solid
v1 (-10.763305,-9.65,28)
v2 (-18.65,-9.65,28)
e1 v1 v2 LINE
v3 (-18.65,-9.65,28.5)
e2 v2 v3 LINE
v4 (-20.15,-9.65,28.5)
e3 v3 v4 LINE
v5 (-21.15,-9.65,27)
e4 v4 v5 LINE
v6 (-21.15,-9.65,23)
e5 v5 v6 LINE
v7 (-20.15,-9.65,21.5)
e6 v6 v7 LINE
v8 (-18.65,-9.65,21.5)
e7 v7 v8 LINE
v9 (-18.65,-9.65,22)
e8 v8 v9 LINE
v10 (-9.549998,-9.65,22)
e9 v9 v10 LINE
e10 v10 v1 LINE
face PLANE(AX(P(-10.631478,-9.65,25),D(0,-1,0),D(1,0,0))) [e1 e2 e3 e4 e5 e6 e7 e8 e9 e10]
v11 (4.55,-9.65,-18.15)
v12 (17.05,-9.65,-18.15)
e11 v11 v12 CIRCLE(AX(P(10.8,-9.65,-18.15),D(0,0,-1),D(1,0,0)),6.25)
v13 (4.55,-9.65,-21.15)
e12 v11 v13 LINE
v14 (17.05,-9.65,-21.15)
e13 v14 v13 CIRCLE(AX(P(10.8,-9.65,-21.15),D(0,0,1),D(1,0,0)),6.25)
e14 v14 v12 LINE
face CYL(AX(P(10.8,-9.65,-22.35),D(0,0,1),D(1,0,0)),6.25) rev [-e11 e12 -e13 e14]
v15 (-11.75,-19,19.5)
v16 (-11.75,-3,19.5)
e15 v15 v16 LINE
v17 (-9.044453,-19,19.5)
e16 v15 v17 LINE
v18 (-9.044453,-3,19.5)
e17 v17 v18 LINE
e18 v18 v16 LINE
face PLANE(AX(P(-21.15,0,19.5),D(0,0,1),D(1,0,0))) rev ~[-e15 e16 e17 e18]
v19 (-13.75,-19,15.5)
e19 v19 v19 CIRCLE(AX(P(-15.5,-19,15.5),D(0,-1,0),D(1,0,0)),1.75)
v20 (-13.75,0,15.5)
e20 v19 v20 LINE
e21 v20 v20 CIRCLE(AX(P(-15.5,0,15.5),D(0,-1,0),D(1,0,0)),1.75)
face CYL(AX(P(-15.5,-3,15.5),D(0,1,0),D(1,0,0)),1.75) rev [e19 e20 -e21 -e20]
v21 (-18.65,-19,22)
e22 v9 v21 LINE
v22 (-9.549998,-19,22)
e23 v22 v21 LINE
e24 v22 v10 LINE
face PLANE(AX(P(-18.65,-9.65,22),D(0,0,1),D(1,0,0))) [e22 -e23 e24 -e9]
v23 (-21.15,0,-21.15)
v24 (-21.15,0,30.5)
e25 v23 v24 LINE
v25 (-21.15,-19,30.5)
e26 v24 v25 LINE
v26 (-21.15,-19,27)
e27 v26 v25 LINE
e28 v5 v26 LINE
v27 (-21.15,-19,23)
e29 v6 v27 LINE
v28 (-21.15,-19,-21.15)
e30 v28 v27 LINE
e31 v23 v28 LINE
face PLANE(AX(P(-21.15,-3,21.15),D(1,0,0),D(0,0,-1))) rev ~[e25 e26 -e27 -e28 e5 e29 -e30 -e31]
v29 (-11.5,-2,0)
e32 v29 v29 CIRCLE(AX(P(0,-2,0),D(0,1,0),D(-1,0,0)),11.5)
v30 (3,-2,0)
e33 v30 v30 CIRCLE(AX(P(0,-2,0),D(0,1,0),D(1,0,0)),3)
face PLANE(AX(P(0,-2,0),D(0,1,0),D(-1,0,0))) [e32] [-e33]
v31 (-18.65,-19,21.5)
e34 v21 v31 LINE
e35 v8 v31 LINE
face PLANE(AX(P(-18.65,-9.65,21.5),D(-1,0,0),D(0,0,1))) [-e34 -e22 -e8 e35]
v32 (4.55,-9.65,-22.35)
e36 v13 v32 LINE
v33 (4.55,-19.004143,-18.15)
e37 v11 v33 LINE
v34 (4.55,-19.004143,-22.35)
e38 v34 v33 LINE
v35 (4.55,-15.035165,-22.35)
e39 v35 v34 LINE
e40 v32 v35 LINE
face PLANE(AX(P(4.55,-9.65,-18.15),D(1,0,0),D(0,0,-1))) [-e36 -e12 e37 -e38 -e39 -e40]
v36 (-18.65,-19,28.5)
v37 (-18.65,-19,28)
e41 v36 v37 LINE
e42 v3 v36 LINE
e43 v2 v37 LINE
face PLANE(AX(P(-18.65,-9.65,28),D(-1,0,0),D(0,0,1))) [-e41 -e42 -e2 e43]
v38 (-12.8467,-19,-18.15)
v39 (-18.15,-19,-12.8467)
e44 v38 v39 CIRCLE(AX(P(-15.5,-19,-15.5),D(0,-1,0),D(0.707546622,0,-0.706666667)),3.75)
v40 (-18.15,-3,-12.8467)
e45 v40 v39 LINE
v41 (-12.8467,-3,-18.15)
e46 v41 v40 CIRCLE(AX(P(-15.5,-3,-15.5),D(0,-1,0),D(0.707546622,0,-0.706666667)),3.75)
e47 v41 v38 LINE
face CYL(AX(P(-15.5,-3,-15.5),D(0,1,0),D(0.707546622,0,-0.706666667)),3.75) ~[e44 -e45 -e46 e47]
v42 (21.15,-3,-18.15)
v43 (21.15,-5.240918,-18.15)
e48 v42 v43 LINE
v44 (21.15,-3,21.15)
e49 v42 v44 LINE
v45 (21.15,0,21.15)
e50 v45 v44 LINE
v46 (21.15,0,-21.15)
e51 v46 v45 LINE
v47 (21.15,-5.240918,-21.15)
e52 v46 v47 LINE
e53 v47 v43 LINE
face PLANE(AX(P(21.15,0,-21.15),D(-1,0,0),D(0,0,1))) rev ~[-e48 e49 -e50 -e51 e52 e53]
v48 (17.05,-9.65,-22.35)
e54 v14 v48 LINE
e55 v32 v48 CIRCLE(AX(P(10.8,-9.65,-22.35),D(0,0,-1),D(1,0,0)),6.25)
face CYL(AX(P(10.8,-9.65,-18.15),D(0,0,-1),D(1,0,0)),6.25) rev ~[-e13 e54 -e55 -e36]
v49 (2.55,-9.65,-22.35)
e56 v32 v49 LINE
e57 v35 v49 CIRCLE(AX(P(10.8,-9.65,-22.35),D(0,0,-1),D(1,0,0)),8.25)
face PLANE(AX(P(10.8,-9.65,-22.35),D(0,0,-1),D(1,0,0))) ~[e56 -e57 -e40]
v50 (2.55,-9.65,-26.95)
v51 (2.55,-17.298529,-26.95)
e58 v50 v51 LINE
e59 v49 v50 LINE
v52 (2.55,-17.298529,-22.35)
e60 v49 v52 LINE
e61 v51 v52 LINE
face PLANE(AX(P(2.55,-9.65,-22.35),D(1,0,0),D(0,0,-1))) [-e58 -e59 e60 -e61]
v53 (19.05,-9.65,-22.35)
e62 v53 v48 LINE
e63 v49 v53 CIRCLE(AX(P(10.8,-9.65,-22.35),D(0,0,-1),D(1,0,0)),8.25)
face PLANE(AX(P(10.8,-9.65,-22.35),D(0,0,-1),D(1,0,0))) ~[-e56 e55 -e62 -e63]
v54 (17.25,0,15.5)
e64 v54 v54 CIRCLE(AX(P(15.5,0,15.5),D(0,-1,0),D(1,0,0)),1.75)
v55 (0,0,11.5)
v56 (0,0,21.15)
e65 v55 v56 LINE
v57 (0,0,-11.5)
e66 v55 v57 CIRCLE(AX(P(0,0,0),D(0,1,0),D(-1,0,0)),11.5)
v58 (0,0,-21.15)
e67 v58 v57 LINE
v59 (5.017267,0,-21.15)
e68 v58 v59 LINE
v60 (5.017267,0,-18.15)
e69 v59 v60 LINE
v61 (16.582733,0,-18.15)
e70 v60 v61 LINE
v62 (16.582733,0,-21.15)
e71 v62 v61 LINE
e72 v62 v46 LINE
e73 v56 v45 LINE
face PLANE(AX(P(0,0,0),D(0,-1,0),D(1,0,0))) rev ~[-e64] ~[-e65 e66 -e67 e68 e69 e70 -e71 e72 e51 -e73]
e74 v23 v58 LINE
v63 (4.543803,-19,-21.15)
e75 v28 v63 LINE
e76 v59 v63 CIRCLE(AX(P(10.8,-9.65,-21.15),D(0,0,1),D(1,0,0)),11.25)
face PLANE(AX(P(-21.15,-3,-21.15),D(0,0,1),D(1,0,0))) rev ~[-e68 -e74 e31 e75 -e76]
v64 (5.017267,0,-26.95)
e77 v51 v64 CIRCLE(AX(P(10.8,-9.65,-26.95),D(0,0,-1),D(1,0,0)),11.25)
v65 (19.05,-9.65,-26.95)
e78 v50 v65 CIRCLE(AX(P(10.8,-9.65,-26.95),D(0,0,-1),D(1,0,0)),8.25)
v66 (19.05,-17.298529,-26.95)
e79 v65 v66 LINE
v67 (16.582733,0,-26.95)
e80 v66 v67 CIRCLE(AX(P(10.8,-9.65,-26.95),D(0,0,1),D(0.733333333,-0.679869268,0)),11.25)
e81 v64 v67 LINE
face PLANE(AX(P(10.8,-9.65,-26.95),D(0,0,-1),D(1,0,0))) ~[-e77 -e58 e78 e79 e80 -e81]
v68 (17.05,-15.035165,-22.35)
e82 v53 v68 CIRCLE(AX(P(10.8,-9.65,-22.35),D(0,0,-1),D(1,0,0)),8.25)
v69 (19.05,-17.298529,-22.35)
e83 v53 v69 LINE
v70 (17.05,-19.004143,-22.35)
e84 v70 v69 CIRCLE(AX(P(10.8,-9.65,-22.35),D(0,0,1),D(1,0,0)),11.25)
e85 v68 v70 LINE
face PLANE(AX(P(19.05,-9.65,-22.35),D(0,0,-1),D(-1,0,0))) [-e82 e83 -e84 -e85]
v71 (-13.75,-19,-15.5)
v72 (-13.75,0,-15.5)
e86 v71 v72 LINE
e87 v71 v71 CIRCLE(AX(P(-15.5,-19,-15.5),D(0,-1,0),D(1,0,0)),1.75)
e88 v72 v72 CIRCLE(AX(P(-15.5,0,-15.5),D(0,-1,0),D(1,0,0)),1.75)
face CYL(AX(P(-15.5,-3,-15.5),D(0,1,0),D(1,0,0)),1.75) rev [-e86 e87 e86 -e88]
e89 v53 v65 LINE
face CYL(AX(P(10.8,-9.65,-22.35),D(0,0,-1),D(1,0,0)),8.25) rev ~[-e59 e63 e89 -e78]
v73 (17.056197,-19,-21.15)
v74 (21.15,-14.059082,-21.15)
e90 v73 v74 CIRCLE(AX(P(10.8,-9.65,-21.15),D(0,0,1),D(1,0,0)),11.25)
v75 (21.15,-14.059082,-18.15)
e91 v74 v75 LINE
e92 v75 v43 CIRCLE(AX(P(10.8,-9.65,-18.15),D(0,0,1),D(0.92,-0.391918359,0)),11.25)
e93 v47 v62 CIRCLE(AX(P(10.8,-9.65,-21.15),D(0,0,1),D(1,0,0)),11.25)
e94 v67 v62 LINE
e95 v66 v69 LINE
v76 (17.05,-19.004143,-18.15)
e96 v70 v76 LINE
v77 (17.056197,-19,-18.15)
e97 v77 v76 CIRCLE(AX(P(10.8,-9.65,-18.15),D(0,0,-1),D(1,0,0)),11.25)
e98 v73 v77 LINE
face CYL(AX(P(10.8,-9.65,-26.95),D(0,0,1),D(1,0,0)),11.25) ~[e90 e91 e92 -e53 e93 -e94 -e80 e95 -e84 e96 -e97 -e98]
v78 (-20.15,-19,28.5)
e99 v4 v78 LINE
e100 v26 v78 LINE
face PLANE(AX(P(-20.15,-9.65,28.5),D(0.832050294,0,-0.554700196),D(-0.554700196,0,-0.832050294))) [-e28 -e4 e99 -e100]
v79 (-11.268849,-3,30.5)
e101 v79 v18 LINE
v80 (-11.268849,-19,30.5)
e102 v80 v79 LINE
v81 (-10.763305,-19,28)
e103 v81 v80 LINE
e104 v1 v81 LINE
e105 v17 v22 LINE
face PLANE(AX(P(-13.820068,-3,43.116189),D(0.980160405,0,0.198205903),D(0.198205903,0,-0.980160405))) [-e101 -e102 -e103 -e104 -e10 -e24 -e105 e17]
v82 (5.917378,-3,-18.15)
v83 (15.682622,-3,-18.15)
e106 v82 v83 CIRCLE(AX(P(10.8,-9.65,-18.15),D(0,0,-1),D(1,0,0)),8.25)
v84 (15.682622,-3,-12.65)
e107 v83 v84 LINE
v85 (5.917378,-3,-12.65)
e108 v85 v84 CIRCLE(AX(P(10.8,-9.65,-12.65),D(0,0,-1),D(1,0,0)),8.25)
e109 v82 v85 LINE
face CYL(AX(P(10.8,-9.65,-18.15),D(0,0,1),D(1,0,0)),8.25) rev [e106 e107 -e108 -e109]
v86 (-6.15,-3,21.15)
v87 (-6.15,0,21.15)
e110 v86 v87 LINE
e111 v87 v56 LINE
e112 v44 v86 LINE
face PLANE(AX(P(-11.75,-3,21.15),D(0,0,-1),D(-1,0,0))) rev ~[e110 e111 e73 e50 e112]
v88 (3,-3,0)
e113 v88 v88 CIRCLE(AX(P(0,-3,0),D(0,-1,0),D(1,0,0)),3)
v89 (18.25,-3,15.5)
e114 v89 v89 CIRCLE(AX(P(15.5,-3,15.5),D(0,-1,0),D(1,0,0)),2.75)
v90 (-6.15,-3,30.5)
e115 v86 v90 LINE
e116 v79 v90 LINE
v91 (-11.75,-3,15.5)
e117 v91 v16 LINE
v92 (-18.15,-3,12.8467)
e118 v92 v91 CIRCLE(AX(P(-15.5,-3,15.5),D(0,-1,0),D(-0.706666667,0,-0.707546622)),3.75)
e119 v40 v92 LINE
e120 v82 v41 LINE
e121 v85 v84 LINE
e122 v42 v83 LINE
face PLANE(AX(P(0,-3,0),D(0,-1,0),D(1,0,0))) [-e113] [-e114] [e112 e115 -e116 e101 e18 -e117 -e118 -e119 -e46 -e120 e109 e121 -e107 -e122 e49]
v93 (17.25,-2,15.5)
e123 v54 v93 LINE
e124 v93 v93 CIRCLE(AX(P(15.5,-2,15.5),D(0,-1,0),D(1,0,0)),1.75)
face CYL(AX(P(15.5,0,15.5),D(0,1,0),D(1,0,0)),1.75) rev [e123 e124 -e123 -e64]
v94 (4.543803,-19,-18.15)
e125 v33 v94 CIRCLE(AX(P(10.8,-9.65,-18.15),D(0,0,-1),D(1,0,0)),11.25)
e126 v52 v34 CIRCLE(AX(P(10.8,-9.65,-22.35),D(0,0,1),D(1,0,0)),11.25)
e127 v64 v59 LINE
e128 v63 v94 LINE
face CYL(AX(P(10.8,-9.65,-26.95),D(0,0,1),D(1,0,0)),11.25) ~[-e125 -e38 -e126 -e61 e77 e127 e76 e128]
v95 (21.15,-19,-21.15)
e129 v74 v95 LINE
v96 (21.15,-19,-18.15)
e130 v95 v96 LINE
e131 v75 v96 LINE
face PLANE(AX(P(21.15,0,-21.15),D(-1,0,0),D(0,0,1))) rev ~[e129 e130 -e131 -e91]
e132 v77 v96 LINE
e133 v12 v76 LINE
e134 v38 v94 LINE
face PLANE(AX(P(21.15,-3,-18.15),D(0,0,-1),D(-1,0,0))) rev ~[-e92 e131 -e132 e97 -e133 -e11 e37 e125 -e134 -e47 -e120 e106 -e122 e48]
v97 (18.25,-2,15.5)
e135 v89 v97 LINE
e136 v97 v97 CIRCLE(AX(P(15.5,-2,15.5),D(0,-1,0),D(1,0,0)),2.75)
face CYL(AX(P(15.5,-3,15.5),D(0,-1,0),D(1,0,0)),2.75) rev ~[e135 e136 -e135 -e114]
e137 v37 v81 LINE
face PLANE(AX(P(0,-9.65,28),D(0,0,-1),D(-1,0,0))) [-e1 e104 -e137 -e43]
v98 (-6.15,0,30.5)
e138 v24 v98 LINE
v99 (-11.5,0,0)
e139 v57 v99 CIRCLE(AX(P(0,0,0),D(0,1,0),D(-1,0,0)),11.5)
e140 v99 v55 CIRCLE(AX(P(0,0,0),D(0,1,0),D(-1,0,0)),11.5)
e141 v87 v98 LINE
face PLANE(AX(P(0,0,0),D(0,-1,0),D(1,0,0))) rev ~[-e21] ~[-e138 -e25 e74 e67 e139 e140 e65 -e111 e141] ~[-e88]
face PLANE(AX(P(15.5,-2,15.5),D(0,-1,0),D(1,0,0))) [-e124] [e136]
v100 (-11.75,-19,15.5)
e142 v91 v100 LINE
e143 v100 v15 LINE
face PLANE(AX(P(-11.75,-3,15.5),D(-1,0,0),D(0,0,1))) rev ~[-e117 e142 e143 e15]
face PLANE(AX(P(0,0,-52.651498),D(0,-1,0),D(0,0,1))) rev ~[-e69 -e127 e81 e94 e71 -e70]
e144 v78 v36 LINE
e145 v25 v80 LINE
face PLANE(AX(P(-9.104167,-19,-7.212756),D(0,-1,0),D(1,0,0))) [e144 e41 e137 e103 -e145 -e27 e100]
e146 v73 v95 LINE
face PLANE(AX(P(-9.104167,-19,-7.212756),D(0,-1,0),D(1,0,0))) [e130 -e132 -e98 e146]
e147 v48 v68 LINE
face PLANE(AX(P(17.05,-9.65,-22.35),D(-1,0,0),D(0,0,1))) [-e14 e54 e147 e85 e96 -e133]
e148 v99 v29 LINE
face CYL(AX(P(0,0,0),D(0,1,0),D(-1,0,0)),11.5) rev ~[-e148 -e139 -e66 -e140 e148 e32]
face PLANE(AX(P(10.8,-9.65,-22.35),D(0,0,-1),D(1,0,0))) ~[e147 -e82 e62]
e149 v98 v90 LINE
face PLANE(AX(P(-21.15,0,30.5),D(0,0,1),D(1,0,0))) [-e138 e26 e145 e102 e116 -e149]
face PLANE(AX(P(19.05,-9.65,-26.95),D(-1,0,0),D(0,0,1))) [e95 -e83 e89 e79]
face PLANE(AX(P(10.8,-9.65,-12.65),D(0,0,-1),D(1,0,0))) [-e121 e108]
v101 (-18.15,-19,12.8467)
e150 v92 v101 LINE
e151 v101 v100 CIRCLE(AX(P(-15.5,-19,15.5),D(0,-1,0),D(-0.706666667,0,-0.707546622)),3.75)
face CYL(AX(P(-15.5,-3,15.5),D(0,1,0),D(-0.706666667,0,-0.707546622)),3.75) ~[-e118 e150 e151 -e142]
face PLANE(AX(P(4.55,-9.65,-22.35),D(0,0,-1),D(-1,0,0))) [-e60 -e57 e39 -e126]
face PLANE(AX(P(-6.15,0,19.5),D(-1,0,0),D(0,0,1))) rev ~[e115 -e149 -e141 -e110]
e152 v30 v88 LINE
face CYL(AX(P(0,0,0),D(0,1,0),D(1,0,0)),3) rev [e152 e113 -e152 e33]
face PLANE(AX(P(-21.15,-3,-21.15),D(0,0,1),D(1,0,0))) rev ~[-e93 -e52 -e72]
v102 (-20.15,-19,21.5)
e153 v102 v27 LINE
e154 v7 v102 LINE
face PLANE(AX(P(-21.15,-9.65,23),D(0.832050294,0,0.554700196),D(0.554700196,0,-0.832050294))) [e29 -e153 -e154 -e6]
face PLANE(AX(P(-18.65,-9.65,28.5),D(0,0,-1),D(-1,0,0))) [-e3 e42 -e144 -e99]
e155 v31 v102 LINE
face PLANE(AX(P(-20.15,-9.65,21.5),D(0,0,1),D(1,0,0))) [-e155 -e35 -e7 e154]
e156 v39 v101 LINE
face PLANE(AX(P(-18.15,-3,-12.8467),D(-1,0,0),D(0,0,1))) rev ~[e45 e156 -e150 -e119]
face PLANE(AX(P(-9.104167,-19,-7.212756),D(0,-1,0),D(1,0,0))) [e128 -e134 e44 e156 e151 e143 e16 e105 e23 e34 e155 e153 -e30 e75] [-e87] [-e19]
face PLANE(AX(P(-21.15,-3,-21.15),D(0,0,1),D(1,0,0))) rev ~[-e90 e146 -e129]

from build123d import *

# Parameters (mm, degrees)
F0_W      = 42.3
F0_H      = 42.3
F0_R      = 1.75
F0_R_2    = 3
F1_DEPTH  = 3
F2_R      = 11.5
F3_DEPTH  = 2
F4_R      = 1.75
F5_DEPTH  = 16
F9_W      = 15
F9_H      = 11
F10_DEPTH = 19
F11_DEPTH = 10
F18_DEPTH = 11.251
F19_W     = 28.3221583813
F19_H     = 99.7033566236
F20_DEPTH = 22.051
F22_DEPTH = 16.0051434669
F23_R     = 2.75
F23_R_2   = 1.75
F24_DEPTH = 1


# Not quite as in the source:
# - a feature names something its author has since deleted; it is built from what else it names


with BuildPart() as f1:
    # F0 (on Front) → F1 (new body)
    with BuildSketch(Plane.XZ):
        Rectangle(F0_W, F0_H)
        with Locations((-15.5, -15.5)):
            Circle(F0_R, mode=Mode.SUBTRACT)
        with Locations((-15.5, 15.5)):
            Circle(F0_R, mode=Mode.SUBTRACT)
        Circle(F0_R_2, mode=Mode.SUBTRACT)
        with Locations((15.5, 15.5)):
            Circle(F0_R, mode=Mode.SUBTRACT)
    extrude(amount=F1_DEPTH)

    # F2 (on face) → F3 (cut)
    with BuildSketch(Plane(origin=(0, 0, 0), x_dir=(-1, 0, 0), z_dir=(0, 1, 0))):
        Circle(F2_R)
    extrude(amount=-F3_DEPTH, mode=Mode.SUBTRACT)

    # F4 (on face) → F5 (join)
    with BuildSketch(Plane.XZ.offset(3)):
        with BuildLine():
            Line((-11.75, 21.15), (-21.15, 21.15))
            Line((-21.15, 21.15), (-21.15, -21.15))
            Line((-21.15, -21.15), (21.15, -21.15))
            Line((21.15, -21.15), (21.15, -18.15))
            Line((21.15, -18.15), (-12.8467001677, -18.15))
            ThreePointArc((-12.8467001677, -18.15), (-12.8483495706, -12.8483495706), (-18.15, -12.8467001677))
            Line((-18.15, -12.8467001677), (-18.15, 12.8467001677))
            ThreePointArc((-18.15, 12.8467001677), (-14.0638593384, 12.0358983849), (-11.75, 15.5))
            Line((-11.75, 15.5), (-11.75, 21.15))
        make_face()
        with Locations((-15.5, -15.5)):
            Circle(F4_R, mode=Mode.SUBTRACT)
        with Locations((-15.5, 15.5)):
            Circle(F4_R, mode=Mode.SUBTRACT)
    extrude(amount=F5_DEPTH)

    # F9 (on Front) → F10 (join, through all)
    with BuildSketch(Plane.XZ):
        with Locations((-13.65, 25)):
            Rectangle(F9_W, F9_H)
    extrude(amount=F10_DEPTH)

    # F8 (on offset) → F11 (cut)
    with BuildSketch(Plane.XZ.offset(9.65)):
        Polygon((0, 22), (0, 28), (-18.65, 28), (-18.65, 28.5), (-20.15, 28.5), (-21.15, 27), (-21.15, 23), (-20.15, 21.5), (-18.65, 21.5), (-18.65, 22), align=None)
    extrude(amount=F11_DEPTH, mode=Mode.SUBTRACT)

    # F13 (on offset) → F14 (revolve, cut)
    with BuildSketch(Plane.XZ.offset(9.65)):
        Polygon((17.05, -18.15), (19.05, -18.15), (19.05, -12.65), (10.8, -12.65), (10.8, -26.95), (19.05, -26.95), (19.05, -22.35), (17.05, -22.35), align=None)
    revolve(axis=Axis((10.8, -9.65, -5.160998553), (0, 0, -1)), mode=Mode.SUBTRACT)

    # F15 (on offset) → F16 (revolve)
    with BuildSketch(Plane.XZ.offset(9.65)):
        Polygon((19.05, -18.15), (17.05, -18.15), (17.05, -22.35), (19.05, -22.35), (19.05, -26.95), (22.05, -26.95), (22.05, -18.15), align=None)
    revolve(axis=Axis((10.8, -9.65, -5.160998553), (0, 0, -1)))

    # F17 (on offset) → F18 (cut, through all)
    with BuildSketch(Plane.XZ.offset(9.65)):
        Polygon((2.55, -12.65), (2.55, -18.15), (4.55, -18.15), (4.55, -22.35), (2.55, -22.35), (2.55, -26.95), (19.05, -26.95), (19.05, -22.35), (17.05, -22.35), (17.05, -18.15), (19.05, -18.15), (19.05, -12.65), align=None)
    extrude(amount=F18_DEPTH, mode=Mode.SUBTRACT)

    # F19 (on Right) → F20 (cut, through all)
    with BuildSketch(Plane.YZ):
        with Locations((14.1610791907, -2.7998201549)):
            Rectangle(F19_W, F19_H)
    extrude(amount=F20_DEPTH, mode=Mode.SUBTRACT)

    # F21 (on face) → F22 (cut, through all)
    with BuildSketch(Plane.XZ.offset(3)):
        with BuildLine():
            ThreePointArc((-4.9008020267, -0.9910295129), (0.9910295129, -4.9008020267), (4.9008020267, 0.9910295129))
            Line((4.9008020267, 0.9910295129), (-4.0184635896, 45.0982477529))
            ThreePointArc((-4.0184635896, 45.0982477529), (-9.9102951291, 49.0080202666), (-13.8200676429, 43.116188727))
            Line((-13.8200676429, 43.116188727), (-4.9008020267, -0.9910295129))
        make_face()
    extrude(amount=F22_DEPTH, mode=Mode.SUBTRACT)

    # F23 (on face) → F24 (cut)
    with BuildSketch(Plane.XZ.offset(3)):
        with Locations((15.5, 15.5)):
            Circle(F23_R)
        with Locations((15.5, 15.5)):
            Circle(F23_R_2, mode=Mode.SUBTRACT)
    extrude(amount=-F24_DEPTH, mode=Mode.SUBTRACT)


solid = f1.part
